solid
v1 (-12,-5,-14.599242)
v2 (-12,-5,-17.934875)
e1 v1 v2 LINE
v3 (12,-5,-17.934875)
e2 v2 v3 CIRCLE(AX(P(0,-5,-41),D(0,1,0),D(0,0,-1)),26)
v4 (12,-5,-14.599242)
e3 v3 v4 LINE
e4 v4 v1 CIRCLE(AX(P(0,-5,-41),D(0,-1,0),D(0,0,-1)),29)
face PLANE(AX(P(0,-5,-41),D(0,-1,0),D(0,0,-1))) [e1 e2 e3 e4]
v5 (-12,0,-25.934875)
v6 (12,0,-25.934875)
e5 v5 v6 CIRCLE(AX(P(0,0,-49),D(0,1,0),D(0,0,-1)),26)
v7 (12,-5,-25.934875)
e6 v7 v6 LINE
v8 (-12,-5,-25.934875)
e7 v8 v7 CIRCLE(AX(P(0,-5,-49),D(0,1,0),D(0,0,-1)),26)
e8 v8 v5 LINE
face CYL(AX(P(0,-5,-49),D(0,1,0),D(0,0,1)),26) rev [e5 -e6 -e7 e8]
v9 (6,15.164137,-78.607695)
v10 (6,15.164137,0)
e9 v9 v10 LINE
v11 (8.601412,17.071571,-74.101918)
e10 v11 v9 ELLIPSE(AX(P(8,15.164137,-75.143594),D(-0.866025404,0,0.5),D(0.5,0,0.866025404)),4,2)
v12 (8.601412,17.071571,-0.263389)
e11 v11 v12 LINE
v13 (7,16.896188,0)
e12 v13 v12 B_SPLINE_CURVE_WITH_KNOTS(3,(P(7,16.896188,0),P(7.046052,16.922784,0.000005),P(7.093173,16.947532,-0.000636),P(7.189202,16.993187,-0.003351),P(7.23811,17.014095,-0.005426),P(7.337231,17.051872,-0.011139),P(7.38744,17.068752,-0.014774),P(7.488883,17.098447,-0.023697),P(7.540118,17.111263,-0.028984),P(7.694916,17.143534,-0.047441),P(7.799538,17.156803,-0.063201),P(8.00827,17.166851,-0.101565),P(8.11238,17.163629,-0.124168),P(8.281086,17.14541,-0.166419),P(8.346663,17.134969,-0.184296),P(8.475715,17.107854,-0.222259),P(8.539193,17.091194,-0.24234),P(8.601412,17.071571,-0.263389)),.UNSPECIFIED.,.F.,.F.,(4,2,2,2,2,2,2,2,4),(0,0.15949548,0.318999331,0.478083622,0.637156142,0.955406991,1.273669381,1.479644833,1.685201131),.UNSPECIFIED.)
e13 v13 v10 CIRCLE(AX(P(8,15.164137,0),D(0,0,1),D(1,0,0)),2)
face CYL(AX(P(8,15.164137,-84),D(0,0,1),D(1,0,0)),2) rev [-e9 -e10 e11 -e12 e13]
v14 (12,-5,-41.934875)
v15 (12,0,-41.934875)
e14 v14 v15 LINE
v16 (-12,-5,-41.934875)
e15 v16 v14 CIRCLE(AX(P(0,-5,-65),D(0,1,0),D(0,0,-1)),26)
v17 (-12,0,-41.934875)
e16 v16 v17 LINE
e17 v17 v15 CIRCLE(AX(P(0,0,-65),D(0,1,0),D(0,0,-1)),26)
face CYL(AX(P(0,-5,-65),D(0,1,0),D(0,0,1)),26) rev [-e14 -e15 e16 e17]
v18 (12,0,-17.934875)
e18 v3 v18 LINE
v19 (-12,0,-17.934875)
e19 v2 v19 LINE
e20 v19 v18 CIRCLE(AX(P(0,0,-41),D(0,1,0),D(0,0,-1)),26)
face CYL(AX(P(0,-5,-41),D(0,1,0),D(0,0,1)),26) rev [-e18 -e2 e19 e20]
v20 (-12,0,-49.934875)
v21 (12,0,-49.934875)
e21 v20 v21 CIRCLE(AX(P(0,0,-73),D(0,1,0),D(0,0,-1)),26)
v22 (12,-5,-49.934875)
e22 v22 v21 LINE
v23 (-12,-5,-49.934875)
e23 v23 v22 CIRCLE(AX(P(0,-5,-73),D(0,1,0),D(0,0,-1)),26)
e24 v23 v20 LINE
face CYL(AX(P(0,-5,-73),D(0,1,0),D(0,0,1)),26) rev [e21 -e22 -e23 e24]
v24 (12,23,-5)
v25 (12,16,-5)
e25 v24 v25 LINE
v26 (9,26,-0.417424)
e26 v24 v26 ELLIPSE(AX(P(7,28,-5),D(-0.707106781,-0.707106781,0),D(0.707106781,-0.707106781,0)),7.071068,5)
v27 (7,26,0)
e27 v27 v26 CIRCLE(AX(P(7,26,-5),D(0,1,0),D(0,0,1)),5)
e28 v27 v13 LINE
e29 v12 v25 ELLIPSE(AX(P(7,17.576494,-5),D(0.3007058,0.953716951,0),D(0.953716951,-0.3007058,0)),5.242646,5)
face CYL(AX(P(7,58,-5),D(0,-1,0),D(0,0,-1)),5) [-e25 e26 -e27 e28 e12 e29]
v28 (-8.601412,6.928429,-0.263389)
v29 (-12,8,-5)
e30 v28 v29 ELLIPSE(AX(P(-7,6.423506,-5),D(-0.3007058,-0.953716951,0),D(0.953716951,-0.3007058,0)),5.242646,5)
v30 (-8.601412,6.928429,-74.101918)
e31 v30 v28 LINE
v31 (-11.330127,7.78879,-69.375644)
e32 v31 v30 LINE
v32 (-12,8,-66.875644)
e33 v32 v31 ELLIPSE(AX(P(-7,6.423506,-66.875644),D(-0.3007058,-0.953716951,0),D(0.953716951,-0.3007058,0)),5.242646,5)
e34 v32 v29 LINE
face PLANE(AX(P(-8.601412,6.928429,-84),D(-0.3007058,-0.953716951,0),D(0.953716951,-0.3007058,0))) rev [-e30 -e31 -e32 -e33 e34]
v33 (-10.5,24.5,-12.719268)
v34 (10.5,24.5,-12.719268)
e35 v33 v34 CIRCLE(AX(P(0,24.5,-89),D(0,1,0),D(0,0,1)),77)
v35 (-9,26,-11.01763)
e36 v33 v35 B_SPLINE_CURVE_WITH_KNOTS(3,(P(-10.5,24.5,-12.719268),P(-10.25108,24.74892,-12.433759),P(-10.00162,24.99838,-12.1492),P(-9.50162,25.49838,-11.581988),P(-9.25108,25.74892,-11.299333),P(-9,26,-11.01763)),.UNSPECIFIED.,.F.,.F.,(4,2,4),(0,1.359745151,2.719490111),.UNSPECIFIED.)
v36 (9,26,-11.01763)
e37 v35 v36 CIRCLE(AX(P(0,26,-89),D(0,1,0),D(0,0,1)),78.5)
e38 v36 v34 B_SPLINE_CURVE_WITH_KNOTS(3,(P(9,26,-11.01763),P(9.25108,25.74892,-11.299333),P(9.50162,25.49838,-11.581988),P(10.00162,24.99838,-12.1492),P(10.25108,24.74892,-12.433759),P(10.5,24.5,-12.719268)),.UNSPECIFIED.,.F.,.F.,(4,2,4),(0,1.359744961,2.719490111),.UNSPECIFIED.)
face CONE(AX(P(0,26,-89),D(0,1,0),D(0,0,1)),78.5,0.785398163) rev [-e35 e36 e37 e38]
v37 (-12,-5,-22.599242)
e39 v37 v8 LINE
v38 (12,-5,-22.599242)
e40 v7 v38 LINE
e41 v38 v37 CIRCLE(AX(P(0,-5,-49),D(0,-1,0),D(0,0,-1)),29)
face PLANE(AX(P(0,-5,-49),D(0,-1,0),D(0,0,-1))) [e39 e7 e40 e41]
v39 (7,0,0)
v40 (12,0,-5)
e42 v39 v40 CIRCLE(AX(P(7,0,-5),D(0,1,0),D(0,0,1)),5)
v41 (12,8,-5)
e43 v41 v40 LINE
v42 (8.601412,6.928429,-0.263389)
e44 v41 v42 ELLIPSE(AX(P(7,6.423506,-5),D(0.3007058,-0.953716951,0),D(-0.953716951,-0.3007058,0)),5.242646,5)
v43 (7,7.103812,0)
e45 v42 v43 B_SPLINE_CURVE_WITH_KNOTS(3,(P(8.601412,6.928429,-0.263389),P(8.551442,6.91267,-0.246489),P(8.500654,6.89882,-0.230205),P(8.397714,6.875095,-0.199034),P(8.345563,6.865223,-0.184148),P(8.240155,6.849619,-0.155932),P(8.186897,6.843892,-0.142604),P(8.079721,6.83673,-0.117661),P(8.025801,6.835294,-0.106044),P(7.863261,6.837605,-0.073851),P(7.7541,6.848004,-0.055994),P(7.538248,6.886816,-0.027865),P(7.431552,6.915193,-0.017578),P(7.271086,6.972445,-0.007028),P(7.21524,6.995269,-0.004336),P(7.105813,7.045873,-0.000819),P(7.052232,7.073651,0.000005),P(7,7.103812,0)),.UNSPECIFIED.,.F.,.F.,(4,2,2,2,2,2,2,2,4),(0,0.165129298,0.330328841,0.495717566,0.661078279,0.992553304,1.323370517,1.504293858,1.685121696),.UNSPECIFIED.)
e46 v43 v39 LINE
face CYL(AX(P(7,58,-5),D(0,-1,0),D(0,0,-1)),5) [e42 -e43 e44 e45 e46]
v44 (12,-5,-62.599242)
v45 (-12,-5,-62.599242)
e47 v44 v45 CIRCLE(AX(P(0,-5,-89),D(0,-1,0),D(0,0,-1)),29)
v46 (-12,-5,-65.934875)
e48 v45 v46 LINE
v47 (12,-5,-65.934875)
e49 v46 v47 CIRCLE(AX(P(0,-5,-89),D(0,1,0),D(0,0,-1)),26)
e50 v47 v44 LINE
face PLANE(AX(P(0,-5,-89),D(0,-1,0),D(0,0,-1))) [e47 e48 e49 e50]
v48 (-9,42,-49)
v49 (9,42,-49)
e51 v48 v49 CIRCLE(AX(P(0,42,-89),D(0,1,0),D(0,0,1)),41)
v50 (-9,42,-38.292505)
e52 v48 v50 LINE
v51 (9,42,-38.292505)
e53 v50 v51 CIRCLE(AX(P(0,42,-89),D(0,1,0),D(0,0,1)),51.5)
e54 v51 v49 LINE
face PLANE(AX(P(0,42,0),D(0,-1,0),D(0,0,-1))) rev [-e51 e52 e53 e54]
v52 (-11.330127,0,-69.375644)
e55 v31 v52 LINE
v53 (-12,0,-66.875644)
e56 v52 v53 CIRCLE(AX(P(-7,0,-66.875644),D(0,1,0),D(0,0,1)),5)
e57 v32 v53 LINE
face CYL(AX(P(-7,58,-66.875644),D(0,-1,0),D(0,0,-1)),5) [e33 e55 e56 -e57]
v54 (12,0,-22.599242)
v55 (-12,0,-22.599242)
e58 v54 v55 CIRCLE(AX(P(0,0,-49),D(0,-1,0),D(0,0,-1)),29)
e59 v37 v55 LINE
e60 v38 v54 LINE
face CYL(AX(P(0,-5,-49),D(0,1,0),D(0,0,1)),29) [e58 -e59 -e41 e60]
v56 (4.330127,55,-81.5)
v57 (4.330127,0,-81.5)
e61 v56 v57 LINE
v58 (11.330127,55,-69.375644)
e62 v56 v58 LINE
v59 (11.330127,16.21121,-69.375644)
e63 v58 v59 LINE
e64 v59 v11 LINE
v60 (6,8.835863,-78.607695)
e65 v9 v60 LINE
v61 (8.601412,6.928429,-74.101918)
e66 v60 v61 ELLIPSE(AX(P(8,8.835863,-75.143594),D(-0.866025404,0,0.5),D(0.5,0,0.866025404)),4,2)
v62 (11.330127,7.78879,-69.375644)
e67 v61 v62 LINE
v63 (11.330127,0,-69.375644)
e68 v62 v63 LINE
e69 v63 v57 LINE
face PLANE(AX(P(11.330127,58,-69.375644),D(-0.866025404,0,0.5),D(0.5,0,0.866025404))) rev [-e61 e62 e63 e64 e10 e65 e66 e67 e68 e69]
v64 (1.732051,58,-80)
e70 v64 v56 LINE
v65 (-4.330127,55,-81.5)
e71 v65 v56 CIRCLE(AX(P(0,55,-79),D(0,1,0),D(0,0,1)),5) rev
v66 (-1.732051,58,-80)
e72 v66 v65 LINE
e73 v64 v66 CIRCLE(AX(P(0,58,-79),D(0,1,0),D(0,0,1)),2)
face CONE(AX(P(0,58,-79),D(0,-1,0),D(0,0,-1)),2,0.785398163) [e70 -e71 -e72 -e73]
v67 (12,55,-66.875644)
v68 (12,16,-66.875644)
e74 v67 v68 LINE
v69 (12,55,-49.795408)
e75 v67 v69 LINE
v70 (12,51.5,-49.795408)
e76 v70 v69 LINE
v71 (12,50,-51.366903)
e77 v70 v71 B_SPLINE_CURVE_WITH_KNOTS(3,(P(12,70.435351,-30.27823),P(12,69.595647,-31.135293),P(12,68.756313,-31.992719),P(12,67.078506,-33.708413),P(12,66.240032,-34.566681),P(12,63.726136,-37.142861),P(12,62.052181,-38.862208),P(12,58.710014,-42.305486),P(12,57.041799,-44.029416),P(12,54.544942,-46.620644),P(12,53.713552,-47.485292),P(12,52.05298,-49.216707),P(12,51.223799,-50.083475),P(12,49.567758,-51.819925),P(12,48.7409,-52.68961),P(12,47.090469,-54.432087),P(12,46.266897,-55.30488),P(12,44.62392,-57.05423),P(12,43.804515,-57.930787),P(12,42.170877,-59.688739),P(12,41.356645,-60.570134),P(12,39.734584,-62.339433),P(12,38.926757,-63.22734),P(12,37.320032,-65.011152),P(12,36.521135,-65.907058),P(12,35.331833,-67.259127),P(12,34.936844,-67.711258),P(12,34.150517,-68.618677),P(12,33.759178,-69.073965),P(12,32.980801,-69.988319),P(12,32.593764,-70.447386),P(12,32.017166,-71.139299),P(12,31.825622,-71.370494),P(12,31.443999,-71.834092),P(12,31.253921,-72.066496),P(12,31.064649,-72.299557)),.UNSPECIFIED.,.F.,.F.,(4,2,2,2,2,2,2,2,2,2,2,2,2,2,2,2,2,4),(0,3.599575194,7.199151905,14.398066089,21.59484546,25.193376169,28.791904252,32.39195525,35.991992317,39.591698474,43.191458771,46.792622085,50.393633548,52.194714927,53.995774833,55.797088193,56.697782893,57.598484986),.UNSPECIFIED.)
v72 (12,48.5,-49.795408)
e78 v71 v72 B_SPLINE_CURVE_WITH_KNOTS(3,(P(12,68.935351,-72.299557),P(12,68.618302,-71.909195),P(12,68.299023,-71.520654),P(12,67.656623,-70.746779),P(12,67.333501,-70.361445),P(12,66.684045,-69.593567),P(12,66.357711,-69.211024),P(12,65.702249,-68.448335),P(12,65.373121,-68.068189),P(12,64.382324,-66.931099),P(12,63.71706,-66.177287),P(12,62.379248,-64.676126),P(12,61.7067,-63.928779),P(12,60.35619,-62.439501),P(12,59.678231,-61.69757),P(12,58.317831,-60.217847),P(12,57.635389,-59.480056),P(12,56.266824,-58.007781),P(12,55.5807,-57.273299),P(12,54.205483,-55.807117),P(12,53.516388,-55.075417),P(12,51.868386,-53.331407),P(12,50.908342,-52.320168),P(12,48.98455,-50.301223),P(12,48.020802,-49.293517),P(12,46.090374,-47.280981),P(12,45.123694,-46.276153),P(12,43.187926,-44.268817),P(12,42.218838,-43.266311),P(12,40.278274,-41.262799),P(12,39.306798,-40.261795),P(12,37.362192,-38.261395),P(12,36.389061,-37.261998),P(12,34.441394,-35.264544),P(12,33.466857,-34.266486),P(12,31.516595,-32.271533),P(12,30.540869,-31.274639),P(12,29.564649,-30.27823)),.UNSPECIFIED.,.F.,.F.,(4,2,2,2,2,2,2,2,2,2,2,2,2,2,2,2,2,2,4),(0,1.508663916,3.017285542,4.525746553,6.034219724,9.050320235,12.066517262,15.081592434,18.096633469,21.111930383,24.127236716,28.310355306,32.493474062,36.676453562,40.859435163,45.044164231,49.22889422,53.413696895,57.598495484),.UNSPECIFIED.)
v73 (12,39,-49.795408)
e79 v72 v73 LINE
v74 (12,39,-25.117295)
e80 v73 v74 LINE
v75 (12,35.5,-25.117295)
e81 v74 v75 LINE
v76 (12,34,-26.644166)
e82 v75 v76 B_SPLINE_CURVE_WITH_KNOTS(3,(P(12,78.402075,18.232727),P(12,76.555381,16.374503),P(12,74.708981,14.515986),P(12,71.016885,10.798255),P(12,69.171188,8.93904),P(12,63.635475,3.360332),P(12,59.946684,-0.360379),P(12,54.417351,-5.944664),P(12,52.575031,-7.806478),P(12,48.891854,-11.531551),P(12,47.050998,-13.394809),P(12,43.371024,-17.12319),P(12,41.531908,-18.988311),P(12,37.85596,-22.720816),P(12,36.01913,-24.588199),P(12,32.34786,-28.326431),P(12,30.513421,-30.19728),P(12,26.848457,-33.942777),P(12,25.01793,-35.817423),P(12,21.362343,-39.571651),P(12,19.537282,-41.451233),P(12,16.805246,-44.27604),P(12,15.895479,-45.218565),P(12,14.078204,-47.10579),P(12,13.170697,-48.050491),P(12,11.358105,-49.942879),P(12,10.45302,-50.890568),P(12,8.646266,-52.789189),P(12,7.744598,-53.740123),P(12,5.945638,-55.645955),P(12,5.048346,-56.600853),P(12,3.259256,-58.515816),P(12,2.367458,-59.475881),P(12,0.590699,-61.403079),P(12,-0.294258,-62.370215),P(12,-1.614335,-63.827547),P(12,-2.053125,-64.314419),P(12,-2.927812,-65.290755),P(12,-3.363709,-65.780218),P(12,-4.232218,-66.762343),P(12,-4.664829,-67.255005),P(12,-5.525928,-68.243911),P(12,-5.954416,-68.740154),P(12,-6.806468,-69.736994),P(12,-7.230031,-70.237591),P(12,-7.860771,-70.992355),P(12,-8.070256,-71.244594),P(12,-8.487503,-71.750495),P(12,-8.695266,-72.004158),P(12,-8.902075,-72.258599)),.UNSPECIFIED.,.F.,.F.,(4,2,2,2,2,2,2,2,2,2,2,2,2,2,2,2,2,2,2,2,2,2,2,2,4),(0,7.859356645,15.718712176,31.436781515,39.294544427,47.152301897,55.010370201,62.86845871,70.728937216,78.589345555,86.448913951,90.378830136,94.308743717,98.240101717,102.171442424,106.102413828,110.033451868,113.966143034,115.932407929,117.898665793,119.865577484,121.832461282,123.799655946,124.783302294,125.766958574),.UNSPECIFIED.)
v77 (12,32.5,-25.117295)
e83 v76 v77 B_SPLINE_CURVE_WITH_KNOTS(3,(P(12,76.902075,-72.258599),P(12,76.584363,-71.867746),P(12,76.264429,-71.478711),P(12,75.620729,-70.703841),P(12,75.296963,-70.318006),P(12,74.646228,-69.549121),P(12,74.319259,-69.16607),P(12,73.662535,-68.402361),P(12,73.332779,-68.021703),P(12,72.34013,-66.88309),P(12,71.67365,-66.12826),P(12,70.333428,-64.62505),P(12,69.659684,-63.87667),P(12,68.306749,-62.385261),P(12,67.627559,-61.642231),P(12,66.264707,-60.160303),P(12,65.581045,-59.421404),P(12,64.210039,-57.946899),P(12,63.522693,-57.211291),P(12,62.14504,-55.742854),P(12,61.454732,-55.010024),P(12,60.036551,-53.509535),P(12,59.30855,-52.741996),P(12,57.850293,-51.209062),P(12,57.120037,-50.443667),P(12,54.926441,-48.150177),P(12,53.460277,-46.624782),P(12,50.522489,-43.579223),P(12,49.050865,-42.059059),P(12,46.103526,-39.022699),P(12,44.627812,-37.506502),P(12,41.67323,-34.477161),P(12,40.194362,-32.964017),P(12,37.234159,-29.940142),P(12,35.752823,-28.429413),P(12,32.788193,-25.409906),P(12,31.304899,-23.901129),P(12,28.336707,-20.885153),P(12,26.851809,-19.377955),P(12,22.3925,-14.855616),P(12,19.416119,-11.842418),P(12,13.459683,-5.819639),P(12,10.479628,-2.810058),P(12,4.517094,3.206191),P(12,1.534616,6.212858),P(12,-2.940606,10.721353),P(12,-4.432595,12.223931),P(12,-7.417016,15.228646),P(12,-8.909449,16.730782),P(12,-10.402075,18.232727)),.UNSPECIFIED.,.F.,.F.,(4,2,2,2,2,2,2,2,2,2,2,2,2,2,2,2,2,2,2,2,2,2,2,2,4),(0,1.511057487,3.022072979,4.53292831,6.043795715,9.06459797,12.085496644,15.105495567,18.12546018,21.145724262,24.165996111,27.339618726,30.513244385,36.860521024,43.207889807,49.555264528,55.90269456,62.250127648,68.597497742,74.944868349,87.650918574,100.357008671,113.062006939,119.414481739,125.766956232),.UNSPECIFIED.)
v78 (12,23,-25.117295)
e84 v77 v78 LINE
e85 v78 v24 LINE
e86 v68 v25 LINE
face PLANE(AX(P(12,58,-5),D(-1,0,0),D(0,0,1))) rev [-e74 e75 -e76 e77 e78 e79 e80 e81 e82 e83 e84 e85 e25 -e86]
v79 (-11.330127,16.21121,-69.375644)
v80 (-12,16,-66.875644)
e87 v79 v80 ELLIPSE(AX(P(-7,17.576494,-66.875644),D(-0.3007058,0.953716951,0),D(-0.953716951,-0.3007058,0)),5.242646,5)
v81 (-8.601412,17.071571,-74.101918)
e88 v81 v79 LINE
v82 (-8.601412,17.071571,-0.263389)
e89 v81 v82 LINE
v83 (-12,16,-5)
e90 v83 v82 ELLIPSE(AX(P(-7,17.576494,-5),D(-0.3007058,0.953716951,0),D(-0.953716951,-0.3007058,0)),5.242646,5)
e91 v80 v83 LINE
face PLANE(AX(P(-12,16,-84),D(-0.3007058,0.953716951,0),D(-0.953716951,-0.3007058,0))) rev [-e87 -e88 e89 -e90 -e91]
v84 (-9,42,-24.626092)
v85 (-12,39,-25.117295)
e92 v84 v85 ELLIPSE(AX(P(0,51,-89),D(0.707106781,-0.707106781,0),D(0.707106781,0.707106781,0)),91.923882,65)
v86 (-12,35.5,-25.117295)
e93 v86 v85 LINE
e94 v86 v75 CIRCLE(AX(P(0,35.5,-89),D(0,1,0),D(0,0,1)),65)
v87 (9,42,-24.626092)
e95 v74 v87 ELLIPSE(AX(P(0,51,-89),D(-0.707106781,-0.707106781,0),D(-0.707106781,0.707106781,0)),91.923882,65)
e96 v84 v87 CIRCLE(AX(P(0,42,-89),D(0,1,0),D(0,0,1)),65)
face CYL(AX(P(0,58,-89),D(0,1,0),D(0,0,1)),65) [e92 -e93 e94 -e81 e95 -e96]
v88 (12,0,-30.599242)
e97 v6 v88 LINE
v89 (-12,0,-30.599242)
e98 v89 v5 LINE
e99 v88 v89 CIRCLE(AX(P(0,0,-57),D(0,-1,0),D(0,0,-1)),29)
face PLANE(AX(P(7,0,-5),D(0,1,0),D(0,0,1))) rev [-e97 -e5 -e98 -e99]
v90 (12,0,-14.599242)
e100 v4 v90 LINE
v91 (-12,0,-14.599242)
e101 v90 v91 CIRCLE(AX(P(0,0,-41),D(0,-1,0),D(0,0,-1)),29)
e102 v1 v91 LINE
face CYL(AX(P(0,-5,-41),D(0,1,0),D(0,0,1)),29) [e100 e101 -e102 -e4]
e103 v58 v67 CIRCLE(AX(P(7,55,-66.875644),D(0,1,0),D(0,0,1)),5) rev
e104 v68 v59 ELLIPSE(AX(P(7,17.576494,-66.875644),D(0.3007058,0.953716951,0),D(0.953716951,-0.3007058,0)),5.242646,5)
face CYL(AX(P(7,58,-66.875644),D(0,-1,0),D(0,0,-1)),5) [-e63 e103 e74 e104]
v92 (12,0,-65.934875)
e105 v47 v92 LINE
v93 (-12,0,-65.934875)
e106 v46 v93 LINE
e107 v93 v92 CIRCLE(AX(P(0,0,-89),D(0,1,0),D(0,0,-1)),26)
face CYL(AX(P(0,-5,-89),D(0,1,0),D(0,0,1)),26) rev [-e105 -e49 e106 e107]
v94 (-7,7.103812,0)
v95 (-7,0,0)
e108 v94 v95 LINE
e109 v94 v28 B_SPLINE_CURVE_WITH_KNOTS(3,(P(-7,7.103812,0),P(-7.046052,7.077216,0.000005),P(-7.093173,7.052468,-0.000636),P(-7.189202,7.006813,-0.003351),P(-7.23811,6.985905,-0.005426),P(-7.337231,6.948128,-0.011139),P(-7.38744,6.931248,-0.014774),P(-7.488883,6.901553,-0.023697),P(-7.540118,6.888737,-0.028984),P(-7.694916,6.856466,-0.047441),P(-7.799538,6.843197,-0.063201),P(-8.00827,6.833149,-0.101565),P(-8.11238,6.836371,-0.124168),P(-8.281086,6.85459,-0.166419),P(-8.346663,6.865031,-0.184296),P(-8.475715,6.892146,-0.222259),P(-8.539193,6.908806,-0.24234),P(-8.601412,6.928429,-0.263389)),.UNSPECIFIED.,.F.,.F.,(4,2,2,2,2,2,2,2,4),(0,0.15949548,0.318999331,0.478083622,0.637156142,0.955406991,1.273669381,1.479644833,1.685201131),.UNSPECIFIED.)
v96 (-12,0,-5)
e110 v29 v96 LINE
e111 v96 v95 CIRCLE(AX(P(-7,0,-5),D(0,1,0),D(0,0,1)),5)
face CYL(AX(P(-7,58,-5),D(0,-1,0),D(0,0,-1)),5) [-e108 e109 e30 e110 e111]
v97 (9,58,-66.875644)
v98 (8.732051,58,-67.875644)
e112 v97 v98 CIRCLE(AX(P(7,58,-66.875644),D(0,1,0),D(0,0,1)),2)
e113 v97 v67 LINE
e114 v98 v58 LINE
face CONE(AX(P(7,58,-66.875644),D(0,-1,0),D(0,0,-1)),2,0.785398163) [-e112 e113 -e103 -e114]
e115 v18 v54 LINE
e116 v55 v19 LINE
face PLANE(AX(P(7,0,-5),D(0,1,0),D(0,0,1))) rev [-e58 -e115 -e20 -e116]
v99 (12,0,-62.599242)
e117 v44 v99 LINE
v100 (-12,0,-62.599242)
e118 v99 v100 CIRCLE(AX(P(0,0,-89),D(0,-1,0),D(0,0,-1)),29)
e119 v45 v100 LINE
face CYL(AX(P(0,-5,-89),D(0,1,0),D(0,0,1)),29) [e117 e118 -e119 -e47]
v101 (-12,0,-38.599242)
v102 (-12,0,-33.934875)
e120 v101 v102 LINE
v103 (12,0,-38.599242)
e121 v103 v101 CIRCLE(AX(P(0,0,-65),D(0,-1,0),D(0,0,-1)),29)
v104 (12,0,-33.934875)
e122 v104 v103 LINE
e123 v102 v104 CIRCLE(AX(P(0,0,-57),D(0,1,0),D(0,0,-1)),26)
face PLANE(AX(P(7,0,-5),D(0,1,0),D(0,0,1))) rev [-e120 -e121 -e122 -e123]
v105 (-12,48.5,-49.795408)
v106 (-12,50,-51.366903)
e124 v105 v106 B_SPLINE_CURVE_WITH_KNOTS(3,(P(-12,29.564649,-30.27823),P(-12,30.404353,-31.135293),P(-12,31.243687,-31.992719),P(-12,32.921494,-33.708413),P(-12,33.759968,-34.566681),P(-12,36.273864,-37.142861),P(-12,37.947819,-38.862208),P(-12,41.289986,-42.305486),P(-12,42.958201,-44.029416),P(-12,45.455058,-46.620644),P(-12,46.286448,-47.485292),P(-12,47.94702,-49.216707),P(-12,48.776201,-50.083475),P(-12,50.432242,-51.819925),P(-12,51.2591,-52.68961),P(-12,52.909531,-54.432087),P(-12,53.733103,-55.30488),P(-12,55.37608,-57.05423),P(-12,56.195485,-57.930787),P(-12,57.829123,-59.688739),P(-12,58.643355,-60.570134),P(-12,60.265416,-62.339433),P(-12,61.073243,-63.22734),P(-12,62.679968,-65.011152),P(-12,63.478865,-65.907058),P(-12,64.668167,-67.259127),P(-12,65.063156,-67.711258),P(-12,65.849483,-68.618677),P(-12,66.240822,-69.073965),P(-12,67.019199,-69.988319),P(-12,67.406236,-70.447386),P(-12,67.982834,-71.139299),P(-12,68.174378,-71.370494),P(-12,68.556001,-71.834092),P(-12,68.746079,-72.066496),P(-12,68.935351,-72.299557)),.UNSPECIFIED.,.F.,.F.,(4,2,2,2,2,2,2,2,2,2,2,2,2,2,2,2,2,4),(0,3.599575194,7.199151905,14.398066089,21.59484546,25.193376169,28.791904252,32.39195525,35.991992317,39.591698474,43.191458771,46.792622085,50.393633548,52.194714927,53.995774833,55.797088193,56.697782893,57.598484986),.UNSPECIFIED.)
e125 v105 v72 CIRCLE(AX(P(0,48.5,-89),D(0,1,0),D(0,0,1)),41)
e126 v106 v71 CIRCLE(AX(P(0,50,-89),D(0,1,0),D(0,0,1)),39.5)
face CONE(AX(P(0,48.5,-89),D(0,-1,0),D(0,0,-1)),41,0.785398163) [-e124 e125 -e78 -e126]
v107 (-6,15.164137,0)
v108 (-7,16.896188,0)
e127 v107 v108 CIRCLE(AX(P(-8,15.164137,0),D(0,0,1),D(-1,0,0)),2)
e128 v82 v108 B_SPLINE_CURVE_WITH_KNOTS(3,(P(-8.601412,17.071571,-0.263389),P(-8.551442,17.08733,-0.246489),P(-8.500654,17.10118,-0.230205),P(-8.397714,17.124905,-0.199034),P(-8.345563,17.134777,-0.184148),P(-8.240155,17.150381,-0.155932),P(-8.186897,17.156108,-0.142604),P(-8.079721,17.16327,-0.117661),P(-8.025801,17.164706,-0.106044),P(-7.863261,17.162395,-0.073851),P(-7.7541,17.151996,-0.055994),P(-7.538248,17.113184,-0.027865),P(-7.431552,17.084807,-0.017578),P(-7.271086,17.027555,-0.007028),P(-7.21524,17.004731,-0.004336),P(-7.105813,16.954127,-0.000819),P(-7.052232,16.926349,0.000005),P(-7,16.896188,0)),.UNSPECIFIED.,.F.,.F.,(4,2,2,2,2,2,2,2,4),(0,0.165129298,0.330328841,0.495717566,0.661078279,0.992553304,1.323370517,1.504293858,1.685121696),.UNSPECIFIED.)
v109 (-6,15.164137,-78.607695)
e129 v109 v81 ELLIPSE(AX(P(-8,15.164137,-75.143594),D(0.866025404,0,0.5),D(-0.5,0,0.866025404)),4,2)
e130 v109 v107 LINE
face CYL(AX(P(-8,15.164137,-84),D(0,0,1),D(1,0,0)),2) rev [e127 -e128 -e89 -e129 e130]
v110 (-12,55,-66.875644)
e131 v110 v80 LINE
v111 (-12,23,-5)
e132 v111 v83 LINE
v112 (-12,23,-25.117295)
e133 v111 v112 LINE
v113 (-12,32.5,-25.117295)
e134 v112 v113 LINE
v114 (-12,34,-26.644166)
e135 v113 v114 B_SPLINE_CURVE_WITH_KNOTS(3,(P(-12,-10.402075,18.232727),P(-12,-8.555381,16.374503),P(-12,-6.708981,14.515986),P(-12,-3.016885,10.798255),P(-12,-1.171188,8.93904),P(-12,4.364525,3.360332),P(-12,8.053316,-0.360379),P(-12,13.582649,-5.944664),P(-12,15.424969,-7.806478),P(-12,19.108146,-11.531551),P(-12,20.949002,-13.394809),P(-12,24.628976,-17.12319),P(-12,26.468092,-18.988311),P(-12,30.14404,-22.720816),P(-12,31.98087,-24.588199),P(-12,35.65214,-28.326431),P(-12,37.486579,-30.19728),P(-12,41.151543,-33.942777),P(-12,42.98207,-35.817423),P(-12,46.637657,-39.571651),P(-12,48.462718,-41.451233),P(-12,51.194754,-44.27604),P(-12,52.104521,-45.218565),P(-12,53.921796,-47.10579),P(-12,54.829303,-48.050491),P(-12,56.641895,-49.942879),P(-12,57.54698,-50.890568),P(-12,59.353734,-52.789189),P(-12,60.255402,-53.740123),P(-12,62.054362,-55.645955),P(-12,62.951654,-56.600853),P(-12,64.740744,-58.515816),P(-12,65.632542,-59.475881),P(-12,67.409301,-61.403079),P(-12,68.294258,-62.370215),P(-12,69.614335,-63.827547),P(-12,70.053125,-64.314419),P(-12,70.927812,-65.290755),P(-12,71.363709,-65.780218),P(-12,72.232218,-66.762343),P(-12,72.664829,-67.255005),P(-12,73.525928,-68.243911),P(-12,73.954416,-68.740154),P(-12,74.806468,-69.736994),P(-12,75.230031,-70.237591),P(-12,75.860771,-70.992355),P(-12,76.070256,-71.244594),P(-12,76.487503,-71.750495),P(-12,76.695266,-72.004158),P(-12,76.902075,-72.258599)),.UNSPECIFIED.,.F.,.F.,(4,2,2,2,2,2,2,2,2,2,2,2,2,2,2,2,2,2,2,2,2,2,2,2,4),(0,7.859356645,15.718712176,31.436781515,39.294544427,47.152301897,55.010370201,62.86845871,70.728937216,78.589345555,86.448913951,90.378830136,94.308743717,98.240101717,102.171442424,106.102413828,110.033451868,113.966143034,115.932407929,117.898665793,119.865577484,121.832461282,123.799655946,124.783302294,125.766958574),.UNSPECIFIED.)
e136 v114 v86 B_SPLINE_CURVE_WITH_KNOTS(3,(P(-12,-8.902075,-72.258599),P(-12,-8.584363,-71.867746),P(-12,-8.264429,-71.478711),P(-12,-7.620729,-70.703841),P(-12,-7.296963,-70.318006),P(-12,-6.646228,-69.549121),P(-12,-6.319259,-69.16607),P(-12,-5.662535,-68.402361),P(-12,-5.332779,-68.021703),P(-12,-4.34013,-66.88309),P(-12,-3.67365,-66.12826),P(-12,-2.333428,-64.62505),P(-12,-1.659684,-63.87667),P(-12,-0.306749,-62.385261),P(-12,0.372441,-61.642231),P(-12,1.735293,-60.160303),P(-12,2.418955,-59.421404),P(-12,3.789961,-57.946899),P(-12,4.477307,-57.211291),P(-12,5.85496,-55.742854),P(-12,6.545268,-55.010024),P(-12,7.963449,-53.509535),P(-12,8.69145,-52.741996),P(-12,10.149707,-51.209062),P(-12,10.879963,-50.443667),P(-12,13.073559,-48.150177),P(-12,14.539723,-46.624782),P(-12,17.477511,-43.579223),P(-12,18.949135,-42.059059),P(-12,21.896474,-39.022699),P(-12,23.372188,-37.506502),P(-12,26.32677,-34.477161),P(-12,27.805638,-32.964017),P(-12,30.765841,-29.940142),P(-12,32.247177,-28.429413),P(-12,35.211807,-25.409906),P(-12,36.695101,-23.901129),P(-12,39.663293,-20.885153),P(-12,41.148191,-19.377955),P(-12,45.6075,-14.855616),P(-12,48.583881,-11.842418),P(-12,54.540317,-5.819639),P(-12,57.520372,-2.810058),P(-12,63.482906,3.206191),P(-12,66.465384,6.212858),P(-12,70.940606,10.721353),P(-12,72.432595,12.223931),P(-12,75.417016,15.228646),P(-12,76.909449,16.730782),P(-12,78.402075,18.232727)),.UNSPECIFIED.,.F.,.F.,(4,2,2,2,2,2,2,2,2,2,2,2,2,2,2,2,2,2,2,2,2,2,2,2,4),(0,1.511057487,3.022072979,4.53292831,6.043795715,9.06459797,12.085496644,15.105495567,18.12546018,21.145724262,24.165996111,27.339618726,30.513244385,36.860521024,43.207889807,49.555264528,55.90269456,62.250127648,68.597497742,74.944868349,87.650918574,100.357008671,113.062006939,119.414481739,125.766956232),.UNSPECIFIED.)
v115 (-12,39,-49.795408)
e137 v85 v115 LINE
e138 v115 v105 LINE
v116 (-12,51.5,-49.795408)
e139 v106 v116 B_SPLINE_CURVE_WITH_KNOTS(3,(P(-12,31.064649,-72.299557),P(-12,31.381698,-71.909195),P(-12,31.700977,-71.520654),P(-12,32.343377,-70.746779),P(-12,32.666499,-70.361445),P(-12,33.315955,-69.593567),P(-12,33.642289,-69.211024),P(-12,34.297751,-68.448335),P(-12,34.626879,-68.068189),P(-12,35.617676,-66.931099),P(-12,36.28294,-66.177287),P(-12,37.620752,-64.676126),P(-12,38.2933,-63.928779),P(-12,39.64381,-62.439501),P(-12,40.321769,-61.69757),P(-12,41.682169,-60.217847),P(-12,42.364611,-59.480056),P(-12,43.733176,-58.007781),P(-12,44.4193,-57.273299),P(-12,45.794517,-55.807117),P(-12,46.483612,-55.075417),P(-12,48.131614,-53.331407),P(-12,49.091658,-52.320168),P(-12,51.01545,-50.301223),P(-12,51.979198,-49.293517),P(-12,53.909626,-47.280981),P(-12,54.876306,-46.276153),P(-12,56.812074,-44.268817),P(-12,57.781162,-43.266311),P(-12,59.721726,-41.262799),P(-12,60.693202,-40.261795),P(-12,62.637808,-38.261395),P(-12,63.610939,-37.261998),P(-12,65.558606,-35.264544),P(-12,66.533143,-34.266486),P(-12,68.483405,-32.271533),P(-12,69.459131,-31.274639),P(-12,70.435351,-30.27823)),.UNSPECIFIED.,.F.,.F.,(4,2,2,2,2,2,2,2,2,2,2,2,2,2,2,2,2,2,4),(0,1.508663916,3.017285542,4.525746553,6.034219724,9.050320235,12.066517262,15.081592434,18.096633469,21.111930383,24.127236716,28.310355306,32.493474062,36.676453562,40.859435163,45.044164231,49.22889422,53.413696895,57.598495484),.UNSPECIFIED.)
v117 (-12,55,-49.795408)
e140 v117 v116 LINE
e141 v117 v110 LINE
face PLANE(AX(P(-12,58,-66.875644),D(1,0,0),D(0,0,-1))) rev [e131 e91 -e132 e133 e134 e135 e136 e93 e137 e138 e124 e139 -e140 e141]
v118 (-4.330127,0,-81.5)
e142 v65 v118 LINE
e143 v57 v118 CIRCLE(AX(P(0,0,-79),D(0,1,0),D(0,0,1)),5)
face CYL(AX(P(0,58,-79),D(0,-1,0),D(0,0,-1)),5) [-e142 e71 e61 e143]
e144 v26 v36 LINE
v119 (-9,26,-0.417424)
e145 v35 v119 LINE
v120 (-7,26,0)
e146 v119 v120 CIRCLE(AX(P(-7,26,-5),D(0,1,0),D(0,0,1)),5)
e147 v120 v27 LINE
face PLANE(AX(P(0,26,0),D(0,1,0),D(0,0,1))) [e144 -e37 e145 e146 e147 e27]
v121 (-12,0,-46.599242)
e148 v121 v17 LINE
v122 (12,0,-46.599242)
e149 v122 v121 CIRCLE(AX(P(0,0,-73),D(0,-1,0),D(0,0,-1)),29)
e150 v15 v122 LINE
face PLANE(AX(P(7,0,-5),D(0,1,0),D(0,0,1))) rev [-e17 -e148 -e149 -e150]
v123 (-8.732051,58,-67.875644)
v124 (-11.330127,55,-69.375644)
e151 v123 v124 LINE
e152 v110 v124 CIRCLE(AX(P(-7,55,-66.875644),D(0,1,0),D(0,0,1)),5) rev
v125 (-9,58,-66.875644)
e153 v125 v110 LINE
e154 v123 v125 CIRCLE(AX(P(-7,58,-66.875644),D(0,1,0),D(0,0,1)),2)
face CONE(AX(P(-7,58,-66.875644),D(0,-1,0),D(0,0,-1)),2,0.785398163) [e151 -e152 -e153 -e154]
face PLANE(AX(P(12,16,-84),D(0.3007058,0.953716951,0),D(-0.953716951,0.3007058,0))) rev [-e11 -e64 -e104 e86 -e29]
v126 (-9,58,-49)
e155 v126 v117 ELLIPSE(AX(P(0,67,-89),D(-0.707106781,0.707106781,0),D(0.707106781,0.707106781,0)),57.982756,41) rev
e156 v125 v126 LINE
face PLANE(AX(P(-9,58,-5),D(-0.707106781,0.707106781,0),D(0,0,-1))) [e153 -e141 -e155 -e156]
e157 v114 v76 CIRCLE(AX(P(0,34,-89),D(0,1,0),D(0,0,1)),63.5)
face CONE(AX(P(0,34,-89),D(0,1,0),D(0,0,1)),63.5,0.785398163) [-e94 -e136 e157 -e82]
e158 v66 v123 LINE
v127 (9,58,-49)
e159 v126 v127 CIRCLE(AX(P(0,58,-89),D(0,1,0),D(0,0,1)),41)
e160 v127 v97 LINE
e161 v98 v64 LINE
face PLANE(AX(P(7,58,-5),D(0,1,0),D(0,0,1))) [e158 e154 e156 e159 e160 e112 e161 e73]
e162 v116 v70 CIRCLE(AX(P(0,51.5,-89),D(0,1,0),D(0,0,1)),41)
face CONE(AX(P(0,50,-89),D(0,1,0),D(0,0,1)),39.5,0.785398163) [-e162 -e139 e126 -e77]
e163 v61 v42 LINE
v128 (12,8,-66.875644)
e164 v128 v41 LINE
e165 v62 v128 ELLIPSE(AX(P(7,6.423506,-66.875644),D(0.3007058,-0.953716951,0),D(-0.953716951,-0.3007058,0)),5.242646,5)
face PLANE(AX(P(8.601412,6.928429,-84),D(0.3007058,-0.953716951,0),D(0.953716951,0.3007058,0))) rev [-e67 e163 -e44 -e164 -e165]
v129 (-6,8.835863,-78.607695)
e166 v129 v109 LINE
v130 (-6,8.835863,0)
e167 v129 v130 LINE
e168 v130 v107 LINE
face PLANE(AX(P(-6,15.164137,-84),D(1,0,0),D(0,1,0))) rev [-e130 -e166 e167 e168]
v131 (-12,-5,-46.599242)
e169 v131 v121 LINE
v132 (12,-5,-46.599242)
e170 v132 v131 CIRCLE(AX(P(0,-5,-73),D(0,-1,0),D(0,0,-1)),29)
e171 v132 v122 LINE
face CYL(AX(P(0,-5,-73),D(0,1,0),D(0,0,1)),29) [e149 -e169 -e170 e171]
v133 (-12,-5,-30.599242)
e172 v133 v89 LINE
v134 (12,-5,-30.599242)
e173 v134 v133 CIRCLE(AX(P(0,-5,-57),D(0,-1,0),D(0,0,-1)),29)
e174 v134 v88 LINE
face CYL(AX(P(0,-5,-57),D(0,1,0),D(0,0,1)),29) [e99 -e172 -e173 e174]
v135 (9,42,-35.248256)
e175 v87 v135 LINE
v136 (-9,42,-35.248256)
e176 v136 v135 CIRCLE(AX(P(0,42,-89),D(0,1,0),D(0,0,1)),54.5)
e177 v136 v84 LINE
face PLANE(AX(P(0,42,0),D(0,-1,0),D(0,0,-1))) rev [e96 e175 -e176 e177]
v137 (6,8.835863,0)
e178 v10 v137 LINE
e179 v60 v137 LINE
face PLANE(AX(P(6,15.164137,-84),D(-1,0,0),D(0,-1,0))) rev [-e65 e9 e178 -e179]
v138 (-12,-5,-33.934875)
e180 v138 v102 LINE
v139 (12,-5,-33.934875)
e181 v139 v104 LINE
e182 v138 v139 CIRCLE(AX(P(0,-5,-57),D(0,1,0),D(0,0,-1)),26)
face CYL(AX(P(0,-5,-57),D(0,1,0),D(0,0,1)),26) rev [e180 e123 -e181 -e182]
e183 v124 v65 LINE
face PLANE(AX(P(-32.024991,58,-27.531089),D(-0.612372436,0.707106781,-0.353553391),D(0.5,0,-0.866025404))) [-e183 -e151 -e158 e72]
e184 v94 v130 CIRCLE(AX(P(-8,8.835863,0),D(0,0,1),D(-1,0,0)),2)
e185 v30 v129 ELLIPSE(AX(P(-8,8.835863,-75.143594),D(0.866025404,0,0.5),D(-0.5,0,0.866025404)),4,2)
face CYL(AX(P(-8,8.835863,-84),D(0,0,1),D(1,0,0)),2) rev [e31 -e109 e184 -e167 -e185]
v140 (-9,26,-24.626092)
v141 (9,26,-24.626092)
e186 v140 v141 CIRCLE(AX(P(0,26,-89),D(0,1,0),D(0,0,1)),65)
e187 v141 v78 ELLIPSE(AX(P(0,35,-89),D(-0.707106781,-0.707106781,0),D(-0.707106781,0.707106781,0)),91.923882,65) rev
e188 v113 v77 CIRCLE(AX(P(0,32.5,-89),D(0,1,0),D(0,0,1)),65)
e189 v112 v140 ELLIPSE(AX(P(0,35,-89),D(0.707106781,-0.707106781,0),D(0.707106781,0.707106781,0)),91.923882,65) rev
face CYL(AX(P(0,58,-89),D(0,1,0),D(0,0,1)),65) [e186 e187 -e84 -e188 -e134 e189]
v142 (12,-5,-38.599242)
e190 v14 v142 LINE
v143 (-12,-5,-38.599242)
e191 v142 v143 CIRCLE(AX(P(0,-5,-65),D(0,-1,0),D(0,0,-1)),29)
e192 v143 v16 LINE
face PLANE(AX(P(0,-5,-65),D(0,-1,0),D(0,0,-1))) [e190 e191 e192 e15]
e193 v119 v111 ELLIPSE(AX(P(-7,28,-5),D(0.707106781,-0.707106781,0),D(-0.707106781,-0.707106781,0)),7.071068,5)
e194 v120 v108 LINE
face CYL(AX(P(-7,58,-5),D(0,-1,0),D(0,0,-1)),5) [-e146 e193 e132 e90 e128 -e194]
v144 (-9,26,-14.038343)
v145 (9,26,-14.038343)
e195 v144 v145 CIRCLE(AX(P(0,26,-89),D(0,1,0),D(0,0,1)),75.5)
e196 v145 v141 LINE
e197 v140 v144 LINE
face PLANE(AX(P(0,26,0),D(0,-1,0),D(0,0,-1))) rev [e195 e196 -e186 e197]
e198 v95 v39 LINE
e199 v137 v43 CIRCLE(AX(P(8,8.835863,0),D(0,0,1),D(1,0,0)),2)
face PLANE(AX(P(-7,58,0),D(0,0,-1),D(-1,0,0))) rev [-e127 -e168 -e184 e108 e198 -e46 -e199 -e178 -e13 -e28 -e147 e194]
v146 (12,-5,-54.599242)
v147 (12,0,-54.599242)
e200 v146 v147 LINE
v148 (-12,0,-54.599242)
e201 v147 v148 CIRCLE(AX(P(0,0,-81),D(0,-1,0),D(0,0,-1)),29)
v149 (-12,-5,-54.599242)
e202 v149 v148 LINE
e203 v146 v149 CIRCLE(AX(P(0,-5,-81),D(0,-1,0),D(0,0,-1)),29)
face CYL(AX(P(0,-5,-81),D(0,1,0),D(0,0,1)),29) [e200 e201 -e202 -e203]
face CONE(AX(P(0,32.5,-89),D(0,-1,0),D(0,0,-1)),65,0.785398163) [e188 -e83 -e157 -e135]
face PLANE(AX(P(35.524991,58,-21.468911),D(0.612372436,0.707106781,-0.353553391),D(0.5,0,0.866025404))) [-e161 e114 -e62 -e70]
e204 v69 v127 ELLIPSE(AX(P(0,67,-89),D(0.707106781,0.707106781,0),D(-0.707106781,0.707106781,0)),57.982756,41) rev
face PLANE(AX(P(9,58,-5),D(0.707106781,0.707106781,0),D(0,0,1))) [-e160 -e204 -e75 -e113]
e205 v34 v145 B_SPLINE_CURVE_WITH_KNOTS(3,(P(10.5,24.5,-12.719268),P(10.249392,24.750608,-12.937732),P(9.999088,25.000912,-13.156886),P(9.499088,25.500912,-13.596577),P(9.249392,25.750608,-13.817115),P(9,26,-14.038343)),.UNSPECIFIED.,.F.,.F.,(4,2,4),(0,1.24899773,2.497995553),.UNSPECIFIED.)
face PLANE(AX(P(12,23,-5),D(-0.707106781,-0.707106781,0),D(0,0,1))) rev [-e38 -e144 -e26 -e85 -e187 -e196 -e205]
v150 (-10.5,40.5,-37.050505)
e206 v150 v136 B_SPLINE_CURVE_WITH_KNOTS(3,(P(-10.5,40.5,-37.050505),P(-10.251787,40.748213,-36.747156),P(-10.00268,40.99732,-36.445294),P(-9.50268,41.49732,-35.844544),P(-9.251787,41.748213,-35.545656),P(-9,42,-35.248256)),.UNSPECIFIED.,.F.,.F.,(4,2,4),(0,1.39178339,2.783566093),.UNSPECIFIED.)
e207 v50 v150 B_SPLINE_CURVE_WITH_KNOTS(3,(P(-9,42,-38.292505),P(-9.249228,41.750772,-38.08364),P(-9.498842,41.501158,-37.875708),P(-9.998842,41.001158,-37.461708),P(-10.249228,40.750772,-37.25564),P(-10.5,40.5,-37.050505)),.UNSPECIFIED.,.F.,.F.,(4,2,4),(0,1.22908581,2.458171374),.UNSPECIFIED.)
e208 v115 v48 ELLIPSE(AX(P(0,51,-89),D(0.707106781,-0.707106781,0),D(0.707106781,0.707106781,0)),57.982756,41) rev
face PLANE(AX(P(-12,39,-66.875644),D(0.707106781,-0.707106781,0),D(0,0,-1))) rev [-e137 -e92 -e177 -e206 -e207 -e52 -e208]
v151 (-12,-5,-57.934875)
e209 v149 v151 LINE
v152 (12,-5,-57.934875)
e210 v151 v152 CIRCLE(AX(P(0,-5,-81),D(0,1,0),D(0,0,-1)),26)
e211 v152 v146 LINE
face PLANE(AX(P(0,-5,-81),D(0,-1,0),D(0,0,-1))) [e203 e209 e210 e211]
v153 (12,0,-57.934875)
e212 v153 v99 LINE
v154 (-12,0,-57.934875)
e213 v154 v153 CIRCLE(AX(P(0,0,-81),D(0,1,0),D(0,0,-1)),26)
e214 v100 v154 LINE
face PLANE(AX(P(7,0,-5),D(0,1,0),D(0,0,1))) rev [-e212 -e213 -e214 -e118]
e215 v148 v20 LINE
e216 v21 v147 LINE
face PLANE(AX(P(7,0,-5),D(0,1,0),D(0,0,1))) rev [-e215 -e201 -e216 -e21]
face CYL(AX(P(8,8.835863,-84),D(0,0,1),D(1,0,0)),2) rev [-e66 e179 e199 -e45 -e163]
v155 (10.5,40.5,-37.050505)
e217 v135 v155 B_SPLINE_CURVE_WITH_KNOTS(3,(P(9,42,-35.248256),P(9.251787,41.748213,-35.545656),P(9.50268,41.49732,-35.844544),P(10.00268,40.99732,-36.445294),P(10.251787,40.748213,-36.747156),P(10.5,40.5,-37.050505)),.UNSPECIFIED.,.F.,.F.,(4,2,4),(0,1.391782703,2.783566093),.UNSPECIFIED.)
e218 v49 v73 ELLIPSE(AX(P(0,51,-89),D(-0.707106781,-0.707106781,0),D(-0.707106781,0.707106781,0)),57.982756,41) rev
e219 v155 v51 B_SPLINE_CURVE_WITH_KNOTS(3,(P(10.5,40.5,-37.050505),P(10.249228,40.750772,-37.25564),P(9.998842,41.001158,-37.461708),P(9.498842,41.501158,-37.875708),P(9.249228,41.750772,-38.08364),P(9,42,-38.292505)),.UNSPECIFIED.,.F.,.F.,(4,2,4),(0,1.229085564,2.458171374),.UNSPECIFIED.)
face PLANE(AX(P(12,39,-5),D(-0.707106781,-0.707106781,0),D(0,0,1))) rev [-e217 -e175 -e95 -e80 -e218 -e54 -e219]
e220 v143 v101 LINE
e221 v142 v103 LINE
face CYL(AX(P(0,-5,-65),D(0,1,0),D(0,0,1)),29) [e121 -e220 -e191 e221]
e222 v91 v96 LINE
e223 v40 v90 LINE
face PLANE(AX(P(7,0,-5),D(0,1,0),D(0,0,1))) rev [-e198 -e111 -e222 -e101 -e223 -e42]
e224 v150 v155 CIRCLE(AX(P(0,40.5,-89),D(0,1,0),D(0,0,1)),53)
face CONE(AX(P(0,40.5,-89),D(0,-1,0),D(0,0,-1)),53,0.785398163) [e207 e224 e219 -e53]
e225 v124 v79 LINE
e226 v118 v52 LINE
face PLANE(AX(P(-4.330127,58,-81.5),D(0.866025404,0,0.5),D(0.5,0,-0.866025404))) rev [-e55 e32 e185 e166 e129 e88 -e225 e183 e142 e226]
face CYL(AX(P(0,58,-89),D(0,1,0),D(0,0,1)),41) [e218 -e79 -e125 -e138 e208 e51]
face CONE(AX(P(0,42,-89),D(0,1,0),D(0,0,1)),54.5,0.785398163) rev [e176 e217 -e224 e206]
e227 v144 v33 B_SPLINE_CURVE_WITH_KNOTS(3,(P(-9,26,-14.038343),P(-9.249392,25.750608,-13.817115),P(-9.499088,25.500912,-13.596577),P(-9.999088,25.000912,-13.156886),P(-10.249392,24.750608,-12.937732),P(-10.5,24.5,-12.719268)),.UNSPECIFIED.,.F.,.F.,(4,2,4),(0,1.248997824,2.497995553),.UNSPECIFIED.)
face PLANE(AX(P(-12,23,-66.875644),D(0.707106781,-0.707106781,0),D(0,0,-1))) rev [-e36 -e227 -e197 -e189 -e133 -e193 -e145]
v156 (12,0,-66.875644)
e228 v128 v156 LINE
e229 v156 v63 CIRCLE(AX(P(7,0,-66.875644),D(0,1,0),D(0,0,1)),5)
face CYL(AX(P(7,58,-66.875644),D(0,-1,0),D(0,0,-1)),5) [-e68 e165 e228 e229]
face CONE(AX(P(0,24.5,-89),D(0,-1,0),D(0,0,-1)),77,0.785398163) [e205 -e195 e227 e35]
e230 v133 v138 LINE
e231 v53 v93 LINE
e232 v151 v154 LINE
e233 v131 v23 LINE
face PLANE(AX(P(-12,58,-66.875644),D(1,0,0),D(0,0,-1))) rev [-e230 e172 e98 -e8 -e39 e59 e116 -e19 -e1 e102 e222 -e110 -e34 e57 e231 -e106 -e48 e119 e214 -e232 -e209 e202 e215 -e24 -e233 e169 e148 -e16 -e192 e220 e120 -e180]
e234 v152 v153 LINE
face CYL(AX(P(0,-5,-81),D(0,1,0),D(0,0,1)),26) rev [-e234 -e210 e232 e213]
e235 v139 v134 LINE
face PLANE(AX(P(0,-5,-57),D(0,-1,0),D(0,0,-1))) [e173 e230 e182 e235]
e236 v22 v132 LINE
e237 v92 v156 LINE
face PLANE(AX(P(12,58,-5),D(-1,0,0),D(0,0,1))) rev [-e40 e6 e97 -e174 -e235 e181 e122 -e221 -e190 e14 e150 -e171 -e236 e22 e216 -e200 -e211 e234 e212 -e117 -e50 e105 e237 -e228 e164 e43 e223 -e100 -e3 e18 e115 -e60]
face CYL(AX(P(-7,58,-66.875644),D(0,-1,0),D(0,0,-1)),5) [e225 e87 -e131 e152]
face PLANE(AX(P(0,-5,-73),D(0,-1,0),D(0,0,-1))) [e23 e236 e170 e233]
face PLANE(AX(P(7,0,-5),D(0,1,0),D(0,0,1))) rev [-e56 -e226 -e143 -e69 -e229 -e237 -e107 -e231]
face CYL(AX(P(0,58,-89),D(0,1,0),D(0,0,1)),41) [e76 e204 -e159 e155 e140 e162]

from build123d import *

# Parameters (mm, degrees)
BOSS_EXTRUDE1_DEPTH = 58
BOSS_EXTRUDE2_DEPTH = 5
CUT_EXTRUDE1_DEPTH  = 103.78132126
CHAMFER1_SIZE       = 3


with BuildPart() as part:
    # Sketch1 → Boss-Extrude1 (new body)
    with BuildSketch(Plane(origin=(0, 0, 0), x_dir=(1, 0, 0), z_dir=(0, 1, 0))):
        with BuildLine():
            Line((-7, 0), (7, 0))
            ThreePointArc((7, 0), (10.535533906, 1.464466094), (12, 5))
            Line((12, 5), (12, 66.875644347))
            ThreePointArc((12, 66.875644347), (11.829629131, 68.169739573), (11.330127019, 69.375644347))
            Line((11.330127019, 69.375644347), (4.330127019, 81.5))
            ThreePointArc((4.330127019, 81.5), (0, 84), (-4.330127019, 81.5))
            Line((-4.330127019, 81.5), (-11.330127019, 69.375644347))
            ThreePointArc((-11.330127019, 69.375644347), (-11.829629131, 68.169739573), (-12, 66.875644347))
            Line((-12, 66.875644347), (-12, 5))
            ThreePointArc((-12, 5), (-10.535533906, 1.464466094), (-7, 0))
        make_face()
    extrude(amount=BOSS_EXTRUDE1_DEPTH)

    # Sketch2 → Cut-Revolve3 (revolve, cut)
    with BuildSketch(Plane(origin=(0, 0, 0), x_dir=(0, 0, -1), z_dir=(1, 0, 0))):
        Polygon((48, 61), (48, 58), (48, 51.5), (49.5, 50), (48, 48.5), (48, 42), (37.5, 42), (36, 40.5), (34.5, 42), (24, 42), (24, 35.5), (25.5, 34), (24, 32.5), (24, 26), (13.5, 26), (12, 24.5), (10.5, 26), (0, 26), (-2, 26), (-2, 61), align=None)
    revolve(axis=Axis((0, 58, -89), (0, -1, 0)), mode=Mode.SUBTRACT)

    # Sketch3 → Boss-Extrude2 (add)
    with BuildSketch(Plane.XZ):
        with BuildLine():
            Line((-12, -54.599242435), (-12, -57.934874811))
            ThreePointArc((-12, -57.934874811), (0, -55), (12, -57.934874811))
            Line((12, -57.934874811), (12, -54.599242435))
            ThreePointArc((12, -54.599242435), (0, -52), (-12, -54.599242435))
        make_face()
        with BuildLine():
            Line((-12, -62.599242435), (-12, -65.934874811))
            ThreePointArc((-12, -65.934874811), (0, -63), (12, -65.934874811))
            Line((12, -65.934874811), (12, -62.599242435))
            ThreePointArc((12, -62.599242435), (0, -60), (-12, -62.599242435))
        make_face()
        with BuildLine():
            Line((-12, -46.599242435), (-12, -49.934874811))
            ThreePointArc((-12, -49.934874811), (0, -47), (12, -49.934874811))
            Line((12, -49.934874811), (12, -46.599242435))
            ThreePointArc((12, -46.599242435), (0, -44), (-12, -46.599242435))
        make_face()
        with BuildLine():
            Line((-12, -38.599242435), (-12, -41.934874811))
            ThreePointArc((-12, -41.934874811), (0, -39), (12, -41.934874811))
            Line((12, -41.934874811), (12, -38.599242435))
            ThreePointArc((12, -38.599242435), (0, -36), (-12, -38.599242435))
        make_face()
        with BuildLine():
            Line((-12, -30.599242435), (-12, -33.934874811))
            ThreePointArc((-12, -33.934874811), (0, -31), (12, -33.934874811))
            Line((12, -33.934874811), (12, -30.599242435))
            ThreePointArc((12, -30.599242435), (0, -28), (-12, -30.599242435))
        make_face()
        with BuildLine():
            Line((-12, -22.599242435), (-12, -25.934874811))
            ThreePointArc((-12, -25.934874811), (0, -23), (12, -25.934874811))
            Line((12, -25.934874811), (12, -22.599242435))
            ThreePointArc((12, -22.599242435), (0, -20), (-12, -22.599242435))
        make_face()
        with BuildLine():
            Line((-12, -14.599242435), (-12, -17.934874811))
            ThreePointArc((-12, -17.934874811), (0, -15), (12, -17.934874811))
            Line((12, -17.934874811), (12, -14.599242435))
            ThreePointArc((12, -14.599242435), (0, -12), (-12, -14.599242435))
        make_face()
    extrude(amount=BOSS_EXTRUDE2_DEPTH)

    # Sketch4 → Cut-Extrude1 (cut, through all)
    with BuildSketch(Plane.XY):
        with BuildLine():
            Line((12, 16), (8.601411599, 17.071570807))
            ThreePointArc((8.601411599, 17.071570807), (6.817380703, 16.777026114), (6, 15.164136905))
            Line((6, 15.164136905), (6, 8.835863095))
            ThreePointArc((6, 8.835863095), (6.817380703, 7.222973886), (8.601411599, 6.928429193))
            Line((8.601411599, 6.928429193), (12, 8))
            Line((12, 8), (12, 16))
        make_face()
        with BuildLine():
            Line((-12, 8), (-12, 16))
            Line((-12, 16), (-8.601411599, 17.071570807))
            ThreePointArc((-8.601411599, 17.071570807), (-6.817380703, 16.777026114), (-6, 15.164136905))
            Line((-6, 15.164136905), (-6, 8.835863095))
            ThreePointArc((-6, 8.835863095), (-6.817380703, 7.222973886), (-8.601411599, 6.928429193))
            Line((-8.601411599, 6.928429193), (-12, 8))
        make_face()
    extrude(amount=-CUT_EXTRUDE1_DEPTH, mode=Mode.SUBTRACT)

    # Chamfer1
    # the kernel refuses this chamfer: 3.639332034, 3.399408886, 3, 2.719454555, 2.619340105 mm, written as the material it takes off along each edge
    with BuildSketch(Plane(origin=(7, 58, -66.875644347), x_dir=(1, 0, 0), z_dir=(0, 0, 1))) as chamfer1_piece_1:
        Polygon((5 - CHAMFER1_SIZE, 0), (5, -CHAMFER1_SIZE), (5, 0), align=None)
    revolve(axis=Axis((7, 58, -66.875644347), (0, 1, 0)), revolution_arc=30, mode=Mode.SUBTRACT)
    with BuildSketch(Plane(origin=(11.330127019, 58, -69.375644347), x_dir=(0, -1, 0), z_dir=(-0.5000000000000017, 0, -0.8660254037844377)), Plane(origin=(-4.330127019, 58, -81.5), x_dir=(0, -1, 0), z_dir=(-0.5000000000000012, 0, 0.8660254037844379))) as chamfer1_piece_2:
        Polygon((CHAMFER1_SIZE, 0), (0, CHAMFER1_SIZE), (0, 0), align=None)
    extrude(amount=14, mode=Mode.SUBTRACT)
    with BuildSketch(Plane(origin=(0, 58, -79), x_dir=(0.8660254037844403, 0, -0.49999999999999706), z_dir=(0.49999999999999706, 0, 0.8660254037844403))) as chamfer1_piece_3:
        Polygon((5, -CHAMFER1_SIZE), (5 - CHAMFER1_SIZE, 0), (5, 0), align=None)
    revolve(axis=Axis((0, 58, -79), (0, 1, 0)), revolution_arc=120, mode=Mode.SUBTRACT)
    with BuildSketch(Plane(origin=(-7, 58, -66.875644347), x_dir=(-0.866025403784439, 0, -0.4999999999999992), z_dir=(0.4999999999999992, 0, -0.866025403784439))) as chamfer1_piece_4:
        Polygon((5, -CHAMFER1_SIZE), (5 - CHAMFER1_SIZE, 0), (5, 0), align=None)
    revolve(axis=Axis((-7, 58, -66.875644347), (0, 1, 0)), revolution_arc=30, mode=Mode.SUBTRACT)
    with BuildSketch(Plane(origin=(12, 58, -42.080359468), x_dir=(-1, 0, 0), z_dir=(0, 0, -1)), Plane(origin=(-12, 58, -66.875644347), x_dir=(1, 0, 0), z_dir=(0, 0, 1))) as chamfer1_piece_5:
        Polygon((CHAMFER1_SIZE, 0), (0, -CHAMFER1_SIZE), (0, 0), align=None)
    extrude(amount=24.795284879, mode=Mode.SUBTRACT)
    with BuildSketch(Plane(origin=(-12, 42, -43.55256219), x_dir=(0, -1, 0), z_dir=(0, 0, 1)), Plane(origin=(12, 42, -17.402246021), x_dir=(0, -1, 0), z_dir=(0, 0, -1))) as chamfer1_piece_6:
        Polygon((CHAMFER1_SIZE, 0), (0, CHAMFER1_SIZE), (0, 0), align=None)
    extrude(amount=26.150316168, mode=Mode.SUBTRACT)
    with BuildSketch(Plane(origin=(12, 26, 2.715048964), x_dir=(-1, 0, 0), z_dir=(0, 0, -1)), Plane(origin=(-12, 26, -19.13766824), x_dir=(1, 0, 0), z_dir=(0, 0, 1))) as chamfer1_piece_7:
        Polygon((CHAMFER1_SIZE, 0), (0, -CHAMFER1_SIZE), (0, 0), align=None)
    extrude(amount=21.852717204, mode=Mode.SUBTRACT)
    # the kernel refuses this chamfer: 3.639332034, 3.399408886, 3, 2.719454555, 2.619340105 mm, written as the material it takes off along each edge
    with BuildSketch(Plane(origin=(-12, 42, -57.510457396), x_dir=(0, -1, 0), z_dir=(0, 0, 1))) as chamfer1_2_piece_1_section:
        Polygon((CHAMFER1_SIZE, 0), (0, CHAMFER1_SIZE), (0, 0), align=None)
    chamfer1_2_piece_1 = extrude(amount=21.67294417, mode=Mode.PRIVATE)
    chamfer1_2_piece_1 = chamfer1_2_piece_1 - Plane(origin=(0, 42, -89), x_dir=(0, 0, 1), z_dir=(0, -1, 0)) * Cylinder(41, 56, mode=Mode.PRIVATE)
    add(chamfer1_2_piece_1, mode=Mode.SUBTRACT)
    with BuildSketch(Plane(origin=(-12, 26, -32.832343949), x_dir=(0, -1, 0), z_dir=(0, 0, 1))) as chamfer1_2_piece_2_section:
        Polygon((CHAMFER1_SIZE, 0), (0, CHAMFER1_SIZE), (0, 0), align=None)
    chamfer1_2_piece_2 = extrude(amount=21.409724673, mode=Mode.PRIVATE)
    chamfer1_2_piece_2 = chamfer1_2_piece_2 - Plane(origin=(0, 26, -89), x_dir=(0, 0, 1), z_dir=(0, -1, 0)) * Cylinder(65, 55, mode=Mode.PRIVATE)
    add(chamfer1_2_piece_2, mode=Mode.SUBTRACT)
    with BuildSketch(Plane(origin=(12, 26, -11.422619276), x_dir=(0, -1, 0), z_dir=(0, 0, -1))) as chamfer1_2_piece_3_section:
        Polygon((CHAMFER1_SIZE, 0), (0, CHAMFER1_SIZE), (0, 0), align=None)
    chamfer1_2_piece_3 = extrude(amount=21.409724673, mode=Mode.PRIVATE)
    chamfer1_2_piece_3 = chamfer1_2_piece_3 - Plane(origin=(0, 26, -89), x_dir=(0, 0, 1), z_dir=(0, -1, 0)) * Cylinder(65, 55, mode=Mode.PRIVATE)
    add(chamfer1_2_piece_3, mode=Mode.SUBTRACT)
    with BuildSketch(Plane(origin=(12, 42, -35.837513226), x_dir=(0, -1, 0), z_dir=(0, 0, -1))) as chamfer1_2_piece_4_section:
        Polygon((CHAMFER1_SIZE, 0), (0, CHAMFER1_SIZE), (0, 0), align=None)
    chamfer1_2_piece_4 = extrude(amount=21.67294417, mode=Mode.PRIVATE)
    chamfer1_2_piece_4 = chamfer1_2_piece_4 - Plane(origin=(0, 42, -89), x_dir=(0, 0, 1), z_dir=(0, -1, 0)) * Cylinder(41, 56, mode=Mode.PRIVATE)
    add(chamfer1_2_piece_4, mode=Mode.SUBTRACT)


solid = part.part
